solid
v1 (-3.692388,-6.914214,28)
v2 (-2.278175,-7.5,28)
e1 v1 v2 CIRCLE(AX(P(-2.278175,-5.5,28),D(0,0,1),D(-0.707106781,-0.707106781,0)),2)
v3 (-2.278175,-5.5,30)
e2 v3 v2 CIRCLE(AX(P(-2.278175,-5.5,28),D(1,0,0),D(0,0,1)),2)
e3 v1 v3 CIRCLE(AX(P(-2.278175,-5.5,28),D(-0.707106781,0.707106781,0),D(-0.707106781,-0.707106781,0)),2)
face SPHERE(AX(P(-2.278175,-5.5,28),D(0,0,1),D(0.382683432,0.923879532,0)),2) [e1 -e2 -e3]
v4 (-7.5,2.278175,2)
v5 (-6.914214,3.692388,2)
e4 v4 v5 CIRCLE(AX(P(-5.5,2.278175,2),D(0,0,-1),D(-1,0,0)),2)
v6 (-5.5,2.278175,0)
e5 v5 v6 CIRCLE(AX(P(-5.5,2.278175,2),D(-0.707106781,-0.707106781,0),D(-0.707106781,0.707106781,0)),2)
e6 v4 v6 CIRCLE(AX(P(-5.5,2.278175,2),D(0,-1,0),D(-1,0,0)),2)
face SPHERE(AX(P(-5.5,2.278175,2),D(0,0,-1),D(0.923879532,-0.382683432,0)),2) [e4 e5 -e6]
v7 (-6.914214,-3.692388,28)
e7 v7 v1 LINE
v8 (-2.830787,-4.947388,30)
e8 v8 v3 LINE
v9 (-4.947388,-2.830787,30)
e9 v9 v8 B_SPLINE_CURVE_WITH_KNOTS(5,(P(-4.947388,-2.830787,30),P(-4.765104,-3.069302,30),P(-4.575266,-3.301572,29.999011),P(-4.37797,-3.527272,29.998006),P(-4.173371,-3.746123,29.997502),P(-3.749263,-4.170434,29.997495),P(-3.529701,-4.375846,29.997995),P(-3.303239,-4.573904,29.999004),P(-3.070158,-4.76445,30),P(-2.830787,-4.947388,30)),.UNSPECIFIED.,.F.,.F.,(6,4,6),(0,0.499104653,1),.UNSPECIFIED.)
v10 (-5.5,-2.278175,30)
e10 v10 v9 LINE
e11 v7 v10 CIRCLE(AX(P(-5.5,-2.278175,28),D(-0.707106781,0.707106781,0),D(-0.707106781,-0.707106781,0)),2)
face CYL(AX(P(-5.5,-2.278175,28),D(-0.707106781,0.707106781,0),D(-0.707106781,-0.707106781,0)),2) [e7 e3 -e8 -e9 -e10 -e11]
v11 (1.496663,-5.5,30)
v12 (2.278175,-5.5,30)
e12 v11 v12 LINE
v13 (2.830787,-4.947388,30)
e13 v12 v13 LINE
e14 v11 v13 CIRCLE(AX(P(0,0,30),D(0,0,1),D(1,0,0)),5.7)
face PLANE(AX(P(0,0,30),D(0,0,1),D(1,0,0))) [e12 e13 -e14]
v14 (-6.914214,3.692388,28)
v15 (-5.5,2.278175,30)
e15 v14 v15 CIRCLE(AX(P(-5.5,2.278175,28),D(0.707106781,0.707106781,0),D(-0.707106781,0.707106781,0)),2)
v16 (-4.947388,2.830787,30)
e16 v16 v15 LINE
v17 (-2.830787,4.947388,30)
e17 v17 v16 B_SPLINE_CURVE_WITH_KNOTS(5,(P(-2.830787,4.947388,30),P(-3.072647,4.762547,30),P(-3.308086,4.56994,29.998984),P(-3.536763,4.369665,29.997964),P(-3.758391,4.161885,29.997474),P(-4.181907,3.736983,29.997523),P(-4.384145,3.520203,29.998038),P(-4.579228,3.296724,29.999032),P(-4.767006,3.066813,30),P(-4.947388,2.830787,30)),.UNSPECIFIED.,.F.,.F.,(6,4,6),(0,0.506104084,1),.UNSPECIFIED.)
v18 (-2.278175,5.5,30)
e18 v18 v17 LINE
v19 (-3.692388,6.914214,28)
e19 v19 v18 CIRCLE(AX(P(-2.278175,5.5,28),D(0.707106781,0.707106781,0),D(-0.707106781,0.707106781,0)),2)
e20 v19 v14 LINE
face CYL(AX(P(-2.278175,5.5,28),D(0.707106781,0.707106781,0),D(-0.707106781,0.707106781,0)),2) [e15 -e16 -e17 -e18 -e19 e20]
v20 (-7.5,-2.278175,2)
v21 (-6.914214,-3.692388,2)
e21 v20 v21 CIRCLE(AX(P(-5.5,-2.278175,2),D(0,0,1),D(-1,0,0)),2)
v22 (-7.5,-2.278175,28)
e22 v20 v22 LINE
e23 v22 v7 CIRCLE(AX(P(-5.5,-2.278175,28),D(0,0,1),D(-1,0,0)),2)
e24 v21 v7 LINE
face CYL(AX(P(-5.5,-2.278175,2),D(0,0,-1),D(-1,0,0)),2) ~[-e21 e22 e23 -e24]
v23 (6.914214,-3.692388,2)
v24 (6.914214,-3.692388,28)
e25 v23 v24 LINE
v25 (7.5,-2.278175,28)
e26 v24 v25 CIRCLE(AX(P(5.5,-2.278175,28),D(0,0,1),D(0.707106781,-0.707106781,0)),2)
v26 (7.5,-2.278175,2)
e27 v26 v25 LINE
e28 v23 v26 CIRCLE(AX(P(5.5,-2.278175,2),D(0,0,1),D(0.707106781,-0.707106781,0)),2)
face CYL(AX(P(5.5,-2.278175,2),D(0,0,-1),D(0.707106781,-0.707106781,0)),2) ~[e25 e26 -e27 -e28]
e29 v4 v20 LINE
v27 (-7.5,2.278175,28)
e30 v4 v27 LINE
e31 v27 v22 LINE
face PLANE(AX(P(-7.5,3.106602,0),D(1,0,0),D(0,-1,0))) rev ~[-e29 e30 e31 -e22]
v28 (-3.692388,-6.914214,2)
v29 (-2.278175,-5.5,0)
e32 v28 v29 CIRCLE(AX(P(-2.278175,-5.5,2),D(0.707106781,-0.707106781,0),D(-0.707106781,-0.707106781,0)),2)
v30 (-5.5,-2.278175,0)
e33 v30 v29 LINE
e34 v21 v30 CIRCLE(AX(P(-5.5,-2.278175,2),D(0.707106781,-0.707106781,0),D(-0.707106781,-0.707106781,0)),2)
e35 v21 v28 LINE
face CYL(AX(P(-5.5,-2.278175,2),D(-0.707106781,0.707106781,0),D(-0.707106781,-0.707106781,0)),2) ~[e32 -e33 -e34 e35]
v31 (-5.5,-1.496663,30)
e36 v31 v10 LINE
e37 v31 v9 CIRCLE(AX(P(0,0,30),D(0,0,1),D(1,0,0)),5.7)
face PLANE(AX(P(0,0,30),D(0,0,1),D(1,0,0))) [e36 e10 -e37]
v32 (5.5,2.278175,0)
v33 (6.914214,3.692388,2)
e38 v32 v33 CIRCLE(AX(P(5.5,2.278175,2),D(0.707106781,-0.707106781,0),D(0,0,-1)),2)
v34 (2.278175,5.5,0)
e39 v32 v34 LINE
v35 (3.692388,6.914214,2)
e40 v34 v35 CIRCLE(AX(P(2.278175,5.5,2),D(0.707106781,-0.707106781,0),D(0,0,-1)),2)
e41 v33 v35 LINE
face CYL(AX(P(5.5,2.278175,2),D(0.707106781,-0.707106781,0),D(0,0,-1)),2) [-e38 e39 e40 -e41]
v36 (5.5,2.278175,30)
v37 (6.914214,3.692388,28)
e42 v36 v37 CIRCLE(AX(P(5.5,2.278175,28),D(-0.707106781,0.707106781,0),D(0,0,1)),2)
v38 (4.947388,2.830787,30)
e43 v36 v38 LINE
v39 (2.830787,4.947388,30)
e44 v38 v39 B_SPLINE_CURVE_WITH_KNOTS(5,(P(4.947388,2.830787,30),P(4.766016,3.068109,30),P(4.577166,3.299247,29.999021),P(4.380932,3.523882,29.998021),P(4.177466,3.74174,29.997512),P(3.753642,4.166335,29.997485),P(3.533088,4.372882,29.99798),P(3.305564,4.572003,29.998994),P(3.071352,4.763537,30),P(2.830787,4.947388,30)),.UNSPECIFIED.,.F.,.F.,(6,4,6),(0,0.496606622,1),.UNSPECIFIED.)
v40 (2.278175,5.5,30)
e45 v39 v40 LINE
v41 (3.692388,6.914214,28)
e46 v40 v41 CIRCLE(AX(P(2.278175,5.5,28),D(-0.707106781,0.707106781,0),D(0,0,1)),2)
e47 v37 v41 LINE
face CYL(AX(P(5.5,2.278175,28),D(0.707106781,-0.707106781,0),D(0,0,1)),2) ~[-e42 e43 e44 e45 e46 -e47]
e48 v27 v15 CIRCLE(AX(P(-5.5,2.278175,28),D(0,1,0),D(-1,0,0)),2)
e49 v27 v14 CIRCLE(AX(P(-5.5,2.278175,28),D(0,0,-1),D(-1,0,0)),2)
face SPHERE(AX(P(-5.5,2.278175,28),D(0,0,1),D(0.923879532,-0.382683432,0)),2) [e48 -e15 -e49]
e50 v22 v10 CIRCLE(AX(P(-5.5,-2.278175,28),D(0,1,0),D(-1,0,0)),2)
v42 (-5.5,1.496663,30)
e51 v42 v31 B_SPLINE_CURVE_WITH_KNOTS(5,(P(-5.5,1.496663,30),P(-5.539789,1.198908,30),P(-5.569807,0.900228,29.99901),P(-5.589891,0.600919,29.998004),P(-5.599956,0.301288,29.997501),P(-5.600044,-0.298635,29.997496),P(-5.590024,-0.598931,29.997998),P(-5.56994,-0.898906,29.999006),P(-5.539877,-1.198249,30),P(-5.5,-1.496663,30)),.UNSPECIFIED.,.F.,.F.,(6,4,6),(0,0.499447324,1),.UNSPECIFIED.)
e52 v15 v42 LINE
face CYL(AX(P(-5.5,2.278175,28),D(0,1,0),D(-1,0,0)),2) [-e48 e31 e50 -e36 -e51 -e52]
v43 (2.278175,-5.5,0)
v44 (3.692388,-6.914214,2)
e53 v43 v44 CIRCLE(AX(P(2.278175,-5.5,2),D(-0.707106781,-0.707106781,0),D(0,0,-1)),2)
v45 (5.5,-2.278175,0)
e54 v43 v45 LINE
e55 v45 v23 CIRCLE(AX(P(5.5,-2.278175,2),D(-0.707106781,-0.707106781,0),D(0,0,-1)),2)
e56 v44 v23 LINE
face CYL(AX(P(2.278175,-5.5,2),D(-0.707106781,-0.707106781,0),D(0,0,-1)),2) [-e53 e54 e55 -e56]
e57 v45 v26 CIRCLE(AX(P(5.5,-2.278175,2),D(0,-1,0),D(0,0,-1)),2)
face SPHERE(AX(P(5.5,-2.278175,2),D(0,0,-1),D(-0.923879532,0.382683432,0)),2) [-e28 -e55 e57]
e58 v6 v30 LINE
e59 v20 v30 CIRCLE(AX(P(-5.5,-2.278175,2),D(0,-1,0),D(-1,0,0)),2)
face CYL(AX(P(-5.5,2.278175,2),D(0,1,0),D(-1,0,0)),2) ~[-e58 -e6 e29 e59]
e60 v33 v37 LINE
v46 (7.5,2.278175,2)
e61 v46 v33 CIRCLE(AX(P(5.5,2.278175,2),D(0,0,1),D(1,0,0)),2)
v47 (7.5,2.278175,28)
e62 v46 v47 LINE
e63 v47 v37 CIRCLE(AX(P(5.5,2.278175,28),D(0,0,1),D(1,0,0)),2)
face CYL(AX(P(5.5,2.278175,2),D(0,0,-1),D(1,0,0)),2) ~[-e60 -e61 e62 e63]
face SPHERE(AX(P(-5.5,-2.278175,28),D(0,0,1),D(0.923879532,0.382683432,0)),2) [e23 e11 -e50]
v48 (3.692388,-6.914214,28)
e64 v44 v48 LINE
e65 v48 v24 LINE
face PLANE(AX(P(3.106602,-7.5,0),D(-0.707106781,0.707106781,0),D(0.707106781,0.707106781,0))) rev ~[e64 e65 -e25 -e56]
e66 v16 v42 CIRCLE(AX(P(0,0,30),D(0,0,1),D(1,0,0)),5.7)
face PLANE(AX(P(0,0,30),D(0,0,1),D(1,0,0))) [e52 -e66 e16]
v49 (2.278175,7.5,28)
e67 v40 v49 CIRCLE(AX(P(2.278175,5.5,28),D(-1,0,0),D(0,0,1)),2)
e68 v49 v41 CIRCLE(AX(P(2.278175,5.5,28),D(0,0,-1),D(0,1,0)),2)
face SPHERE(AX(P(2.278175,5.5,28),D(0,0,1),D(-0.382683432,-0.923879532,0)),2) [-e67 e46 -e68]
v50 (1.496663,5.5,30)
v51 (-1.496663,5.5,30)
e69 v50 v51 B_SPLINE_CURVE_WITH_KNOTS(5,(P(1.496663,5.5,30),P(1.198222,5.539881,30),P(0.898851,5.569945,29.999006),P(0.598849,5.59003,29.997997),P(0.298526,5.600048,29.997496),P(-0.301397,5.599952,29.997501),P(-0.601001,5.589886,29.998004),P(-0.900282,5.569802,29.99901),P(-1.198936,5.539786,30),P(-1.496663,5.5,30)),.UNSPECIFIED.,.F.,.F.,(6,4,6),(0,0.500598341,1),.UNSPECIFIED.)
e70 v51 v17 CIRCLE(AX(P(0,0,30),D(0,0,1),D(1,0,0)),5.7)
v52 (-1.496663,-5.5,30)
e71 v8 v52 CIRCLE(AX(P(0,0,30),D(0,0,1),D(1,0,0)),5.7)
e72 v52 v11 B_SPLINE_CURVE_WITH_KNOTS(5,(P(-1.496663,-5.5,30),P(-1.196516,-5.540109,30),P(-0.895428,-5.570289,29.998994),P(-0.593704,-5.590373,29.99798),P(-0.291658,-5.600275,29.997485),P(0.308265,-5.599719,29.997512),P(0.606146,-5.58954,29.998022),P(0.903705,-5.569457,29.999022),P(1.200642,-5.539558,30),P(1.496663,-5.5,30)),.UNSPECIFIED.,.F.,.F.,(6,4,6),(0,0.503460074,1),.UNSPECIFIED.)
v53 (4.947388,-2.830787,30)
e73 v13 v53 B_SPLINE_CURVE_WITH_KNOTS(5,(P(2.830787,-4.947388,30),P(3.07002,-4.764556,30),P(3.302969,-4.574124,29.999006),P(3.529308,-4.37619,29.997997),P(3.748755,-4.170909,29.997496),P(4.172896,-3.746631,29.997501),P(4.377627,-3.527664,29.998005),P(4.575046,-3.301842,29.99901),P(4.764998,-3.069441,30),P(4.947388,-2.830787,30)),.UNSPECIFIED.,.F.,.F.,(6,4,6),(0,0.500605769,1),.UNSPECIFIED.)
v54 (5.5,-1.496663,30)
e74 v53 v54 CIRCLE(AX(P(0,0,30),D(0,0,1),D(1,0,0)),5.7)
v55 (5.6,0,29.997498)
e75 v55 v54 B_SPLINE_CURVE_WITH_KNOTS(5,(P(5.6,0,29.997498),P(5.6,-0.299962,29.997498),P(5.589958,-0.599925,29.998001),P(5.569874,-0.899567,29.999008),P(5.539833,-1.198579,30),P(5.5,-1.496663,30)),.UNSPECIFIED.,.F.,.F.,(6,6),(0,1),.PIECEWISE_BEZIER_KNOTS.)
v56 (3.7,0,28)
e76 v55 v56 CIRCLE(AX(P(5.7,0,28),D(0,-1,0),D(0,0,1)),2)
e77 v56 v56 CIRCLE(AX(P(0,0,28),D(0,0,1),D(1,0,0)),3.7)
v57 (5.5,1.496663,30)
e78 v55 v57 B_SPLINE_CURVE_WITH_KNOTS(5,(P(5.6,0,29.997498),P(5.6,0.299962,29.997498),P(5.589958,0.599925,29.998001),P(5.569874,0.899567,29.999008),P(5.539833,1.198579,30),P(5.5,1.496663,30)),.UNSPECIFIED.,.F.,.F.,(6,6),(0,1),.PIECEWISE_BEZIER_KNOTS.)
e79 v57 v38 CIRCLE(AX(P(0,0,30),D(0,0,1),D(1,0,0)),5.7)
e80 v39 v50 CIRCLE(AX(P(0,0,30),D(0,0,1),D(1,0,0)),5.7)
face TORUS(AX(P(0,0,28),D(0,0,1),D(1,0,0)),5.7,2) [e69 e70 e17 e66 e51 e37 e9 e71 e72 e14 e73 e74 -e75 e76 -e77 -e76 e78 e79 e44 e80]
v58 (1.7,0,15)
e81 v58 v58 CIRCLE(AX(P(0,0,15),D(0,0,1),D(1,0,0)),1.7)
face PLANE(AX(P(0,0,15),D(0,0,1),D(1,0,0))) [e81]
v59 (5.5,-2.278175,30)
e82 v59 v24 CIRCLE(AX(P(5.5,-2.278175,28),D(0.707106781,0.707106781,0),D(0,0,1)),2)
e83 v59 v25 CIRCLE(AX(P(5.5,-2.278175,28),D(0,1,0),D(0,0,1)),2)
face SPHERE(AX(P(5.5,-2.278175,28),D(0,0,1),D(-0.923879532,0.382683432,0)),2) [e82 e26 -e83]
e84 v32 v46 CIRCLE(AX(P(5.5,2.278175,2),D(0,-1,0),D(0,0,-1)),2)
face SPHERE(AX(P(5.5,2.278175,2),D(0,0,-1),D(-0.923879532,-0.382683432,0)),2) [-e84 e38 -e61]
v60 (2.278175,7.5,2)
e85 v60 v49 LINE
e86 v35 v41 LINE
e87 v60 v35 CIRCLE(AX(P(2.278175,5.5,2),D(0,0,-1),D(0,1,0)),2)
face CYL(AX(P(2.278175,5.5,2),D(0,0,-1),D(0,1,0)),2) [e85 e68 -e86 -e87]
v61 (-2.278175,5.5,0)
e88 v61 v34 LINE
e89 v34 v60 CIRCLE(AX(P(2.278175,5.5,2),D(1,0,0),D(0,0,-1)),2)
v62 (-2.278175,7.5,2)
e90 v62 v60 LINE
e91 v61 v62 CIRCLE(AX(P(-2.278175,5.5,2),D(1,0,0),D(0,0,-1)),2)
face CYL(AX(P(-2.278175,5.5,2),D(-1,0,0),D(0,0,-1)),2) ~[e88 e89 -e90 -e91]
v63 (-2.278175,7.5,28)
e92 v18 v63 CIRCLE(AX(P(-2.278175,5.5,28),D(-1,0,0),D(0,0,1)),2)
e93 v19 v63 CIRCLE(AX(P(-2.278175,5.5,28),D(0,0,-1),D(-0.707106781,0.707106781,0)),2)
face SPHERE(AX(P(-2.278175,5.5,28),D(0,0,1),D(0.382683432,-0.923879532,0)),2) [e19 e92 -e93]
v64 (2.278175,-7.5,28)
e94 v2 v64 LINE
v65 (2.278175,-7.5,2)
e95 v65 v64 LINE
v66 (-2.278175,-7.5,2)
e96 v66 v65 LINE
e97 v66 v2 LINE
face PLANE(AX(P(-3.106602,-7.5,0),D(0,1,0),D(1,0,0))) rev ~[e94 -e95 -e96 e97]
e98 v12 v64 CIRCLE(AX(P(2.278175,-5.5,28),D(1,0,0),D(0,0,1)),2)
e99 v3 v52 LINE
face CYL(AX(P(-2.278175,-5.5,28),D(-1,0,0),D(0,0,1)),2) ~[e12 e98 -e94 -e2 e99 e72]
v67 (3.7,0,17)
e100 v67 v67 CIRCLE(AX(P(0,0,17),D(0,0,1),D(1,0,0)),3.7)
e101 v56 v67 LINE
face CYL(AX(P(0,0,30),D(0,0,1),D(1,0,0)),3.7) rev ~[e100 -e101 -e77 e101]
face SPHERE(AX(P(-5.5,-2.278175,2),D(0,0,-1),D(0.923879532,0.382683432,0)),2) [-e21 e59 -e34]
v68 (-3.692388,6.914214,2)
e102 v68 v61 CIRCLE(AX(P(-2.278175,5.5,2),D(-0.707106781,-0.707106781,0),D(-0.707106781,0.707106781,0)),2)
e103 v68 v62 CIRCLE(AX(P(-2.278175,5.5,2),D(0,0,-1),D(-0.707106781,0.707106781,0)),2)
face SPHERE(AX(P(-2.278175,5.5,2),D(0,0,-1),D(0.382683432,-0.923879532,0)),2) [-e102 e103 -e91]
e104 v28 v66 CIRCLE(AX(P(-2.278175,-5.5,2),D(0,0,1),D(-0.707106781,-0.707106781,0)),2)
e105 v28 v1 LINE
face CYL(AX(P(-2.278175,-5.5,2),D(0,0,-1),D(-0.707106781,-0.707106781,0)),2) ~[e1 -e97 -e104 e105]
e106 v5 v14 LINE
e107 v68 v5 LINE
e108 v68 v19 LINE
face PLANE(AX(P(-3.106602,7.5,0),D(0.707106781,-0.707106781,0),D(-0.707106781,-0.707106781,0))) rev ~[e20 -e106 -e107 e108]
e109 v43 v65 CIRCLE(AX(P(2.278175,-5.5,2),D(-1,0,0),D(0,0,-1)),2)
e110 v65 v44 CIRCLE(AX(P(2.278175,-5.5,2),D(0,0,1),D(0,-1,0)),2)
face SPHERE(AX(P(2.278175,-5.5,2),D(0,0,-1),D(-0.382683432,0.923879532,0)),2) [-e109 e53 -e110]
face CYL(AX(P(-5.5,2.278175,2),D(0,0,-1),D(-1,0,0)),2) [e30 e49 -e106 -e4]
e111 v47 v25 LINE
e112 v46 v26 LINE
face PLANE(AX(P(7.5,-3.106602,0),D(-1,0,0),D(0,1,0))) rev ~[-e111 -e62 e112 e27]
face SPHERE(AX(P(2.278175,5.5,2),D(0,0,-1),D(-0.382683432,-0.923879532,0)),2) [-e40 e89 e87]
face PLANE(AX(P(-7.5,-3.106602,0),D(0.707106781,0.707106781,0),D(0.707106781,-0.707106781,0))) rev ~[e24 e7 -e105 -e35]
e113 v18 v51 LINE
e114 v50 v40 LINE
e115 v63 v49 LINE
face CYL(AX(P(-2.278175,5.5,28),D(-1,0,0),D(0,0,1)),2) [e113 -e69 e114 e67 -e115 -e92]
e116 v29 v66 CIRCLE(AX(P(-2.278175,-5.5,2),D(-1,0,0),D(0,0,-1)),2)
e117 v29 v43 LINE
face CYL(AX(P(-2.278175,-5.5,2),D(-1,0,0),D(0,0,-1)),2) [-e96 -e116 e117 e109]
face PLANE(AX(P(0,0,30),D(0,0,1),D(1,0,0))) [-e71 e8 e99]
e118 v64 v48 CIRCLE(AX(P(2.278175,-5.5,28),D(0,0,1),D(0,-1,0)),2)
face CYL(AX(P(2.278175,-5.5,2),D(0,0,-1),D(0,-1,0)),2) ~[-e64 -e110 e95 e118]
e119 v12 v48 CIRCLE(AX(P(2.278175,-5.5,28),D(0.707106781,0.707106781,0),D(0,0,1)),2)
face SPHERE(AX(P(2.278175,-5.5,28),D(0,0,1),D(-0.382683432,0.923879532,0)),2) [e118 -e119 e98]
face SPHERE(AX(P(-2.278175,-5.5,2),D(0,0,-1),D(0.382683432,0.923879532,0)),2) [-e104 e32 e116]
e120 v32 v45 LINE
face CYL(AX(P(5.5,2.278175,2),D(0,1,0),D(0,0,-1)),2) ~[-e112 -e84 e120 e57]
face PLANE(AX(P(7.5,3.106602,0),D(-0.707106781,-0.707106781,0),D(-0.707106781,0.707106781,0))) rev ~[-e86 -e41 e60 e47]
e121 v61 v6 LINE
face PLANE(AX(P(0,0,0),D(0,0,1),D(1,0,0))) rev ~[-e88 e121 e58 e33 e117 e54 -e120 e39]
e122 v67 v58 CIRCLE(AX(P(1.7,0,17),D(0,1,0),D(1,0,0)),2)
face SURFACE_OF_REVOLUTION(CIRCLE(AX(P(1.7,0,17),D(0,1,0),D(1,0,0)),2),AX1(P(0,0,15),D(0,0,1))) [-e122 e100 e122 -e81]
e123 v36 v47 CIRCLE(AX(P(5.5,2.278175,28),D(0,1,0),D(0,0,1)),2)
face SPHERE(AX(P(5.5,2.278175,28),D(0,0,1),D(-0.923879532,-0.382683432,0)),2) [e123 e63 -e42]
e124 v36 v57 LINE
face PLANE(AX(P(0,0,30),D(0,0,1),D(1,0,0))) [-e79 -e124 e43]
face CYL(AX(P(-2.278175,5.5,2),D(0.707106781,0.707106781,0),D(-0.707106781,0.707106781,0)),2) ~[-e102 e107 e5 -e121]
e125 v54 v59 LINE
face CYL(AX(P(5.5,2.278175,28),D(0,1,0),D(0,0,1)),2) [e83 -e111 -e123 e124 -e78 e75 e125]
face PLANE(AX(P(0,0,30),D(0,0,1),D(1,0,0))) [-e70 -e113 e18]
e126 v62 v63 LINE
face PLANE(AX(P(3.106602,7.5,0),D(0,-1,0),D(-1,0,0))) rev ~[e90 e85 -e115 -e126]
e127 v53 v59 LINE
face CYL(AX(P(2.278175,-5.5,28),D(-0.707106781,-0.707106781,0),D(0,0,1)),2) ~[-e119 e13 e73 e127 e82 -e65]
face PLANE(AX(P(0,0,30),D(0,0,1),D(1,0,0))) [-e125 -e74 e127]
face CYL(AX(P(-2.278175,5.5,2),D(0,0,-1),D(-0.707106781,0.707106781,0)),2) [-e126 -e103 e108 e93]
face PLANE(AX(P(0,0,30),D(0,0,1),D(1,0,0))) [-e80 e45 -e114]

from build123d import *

# Parameters (mm, degrees)
F1_DEPTH      = 30
F2_R          = 3.7
F3_DEPTH      = 15
F4_T3_DEPTH   = 4.5563491861
F4_T5_DEPTH   = 26
F4_T7_DEPTH   = 4.5563491861
F4_T9_DEPTH   = 4.5563491861
F4_T11_DEPTH  = 4.5563491861
F4_T13_DEPTH  = 4.5563491861
F4_T15_DEPTH  = 4.5563491861
F4_T20_DEPTH  = 2
F4_T26_DEPTH  = 2
F4_T32_DEPTH  = 2
F4_T38_DEPTH  = 2
F4_T44_DEPTH  = 2
F4_T50_DEPTH  = 2
F4_T56_DEPTH  = 2
F4_T62_DEPTH  = 2
F4_T68_DEPTH  = 2
F4_T74_DEPTH  = 2
F4_T80_DEPTH  = 2
F4_T86_DEPTH  = 2
F4_T92_DEPTH  = 2
F4_T98_DEPTH  = 2
F4_T104_DEPTH = 2
F4_T110_DEPTH = 2


# Not quite as in the source:
# - a fillet or chamfer that OpenCascade refuses, or shapes differently, is made with other operations: its cross-section is extruded or revolved along the edge and cut away or added


with BuildPart() as f1:
    # F0 (on Top) → F1 (new body)
    with BuildSketch(Plane.XY):
        Polygon((-7.5, 3.1066017178), (-7.5, -3.1066017178), (-3.1066017178, -7.5), (3.1066017178, -7.5), (7.5, -3.1066017178), (7.5, 3.1066017178), (3.1066017178, 7.5), (-3.1066017178, 7.5), align=None)
    extrude(amount=F1_DEPTH)

    # F2 (on face) → F3 (cut)
    with BuildSketch(Plane.XY.offset(30)):
        Circle(F2_R)
    extrude(amount=-F3_DEPTH, mode=Mode.SUBTRACT)

    # F4: fillet of radius 2 on 26 edges, made by hand

    # F4_s1 → F4_t2 (revolve)
    with BuildSketch(Plane.XZ):
        with BuildLine():
            ThreePointArc((3.7, 17), (3.1142135624, 15.5857864376), (1.7, 15))
            Line((1.7, 15), (3.7, 15))
            Line((3.7, 15), (3.7, 17))
        make_face()
    revolve(axis=Axis((0, 0, 15), (0, 0, 1)))

    # F4_s4 → F4_t3 (cut)
    with BuildSketch(Plane(origin=(-1.6109127035, -1.6109127035, 0), x_dir=(0, 0, 1), z_dir=(0.7071067812, 0.7071067812, 0))):
        with BuildLine():
            ThreePointArc((0, 5.5), (0.5857864376, 6.9142135624), (2, 7.5))
            Line((2, 7.5), (0, 7.5))
            Line((0, 7.5), (0, 5.5))
        make_face()
        with BuildLine():
            ThreePointArc((30, 5.5), (29.4142135624, 6.9142135624), (28, 7.5))
            Line((28, 7.5), (30, 7.5))
            Line((30, 7.5), (30, 5.5))
        make_face()
    extrude(amount=F4_T3_DEPTH, mode=Mode.SUBTRACT)

    # F4_s6 → F4_t5 (cut)
    with BuildSketch(Plane.XY.offset(2)):
        with BuildLine():
            ThreePointArc((6.9142135624, -3.6923881554), (7.347759065, -3.0435414578), (7.5, -2.2781745931))
            Line((7.5, -2.2781745931), (7.5, -3.1066017178))
            Line((7.5, -3.1066017178), (6.9142135624, -3.6923881554))
        make_face()
        with BuildLine():
            ThreePointArc((7.5, 2.2781745931), (7.347759065, 3.0435414578), (6.9142135624, 3.6923881554))
            Line((6.9142135624, 3.6923881554), (7.5, 3.1066017178))
            Line((7.5, 3.1066017178), (7.5, 2.2781745931))
        make_face()
        with BuildLine():
            ThreePointArc((-7.5, 2.2781745931), (-7.347759065, 3.0435414578), (-6.9142135624, 3.6923881554))
            Line((-6.9142135624, 3.6923881554), (-7.5, 3.1066017178))
            Line((-7.5, 3.1066017178), (-7.5, 2.2781745931))
        make_face()
        with BuildLine():
            ThreePointArc((-3.6923881554, 6.9142135624), (-3.0435414578, 7.347759065), (-2.2781745931, 7.5))
            Line((-2.2781745931, 7.5), (-3.1066017178, 7.5))
            Line((-3.1066017178, 7.5), (-3.6923881554, 6.9142135624))
        make_face()
        with BuildLine():
            ThreePointArc((-3.6923881554, -6.9142135624), (-3.0435414578, -7.347759065), (-2.2781745931, -7.5))
            Line((-2.2781745931, -7.5), (-3.1066017178, -7.5))
            Line((-3.1066017178, -7.5), (-3.6923881554, -6.9142135624))
        make_face()
        with BuildLine():
            ThreePointArc((-7.5, -2.2781745931), (-7.347759065, -3.0435414578), (-6.9142135624, -3.6923881554))
            Line((-6.9142135624, -3.6923881554), (-7.5, -3.1066017178))
            Line((-7.5, -3.1066017178), (-7.5, -2.2781745931))
        make_face()
        with BuildLine():
            ThreePointArc((2.2781745931, -7.5), (3.0435414578, -7.347759065), (3.6923881554, -6.9142135624))
            Line((3.6923881554, -6.9142135624), (3.1066017178, -7.5))
            Line((3.1066017178, -7.5), (2.2781745931, -7.5))
        make_face()
        with BuildLine():
            ThreePointArc((2.2781745931, 7.5), (3.0435414578, 7.347759065), (3.6923881554, 6.9142135624))
            Line((3.6923881554, 6.9142135624), (3.1066017178, 7.5))
            Line((3.1066017178, 7.5), (2.2781745931, 7.5))
        make_face()
    extrude(amount=F4_T5_DEPTH, mode=Mode.SUBTRACT)

    # F4_s8 → F4_t7 (cut)
    with BuildSketch(Plane.YZ.offset(-2.2781745931)):
        with BuildLine():
            ThreePointArc((-5.5, 0), (-6.9142135624, 0.5857864376), (-7.5, 2))
            Line((-7.5, 2), (-7.5, 0))
            Line((-7.5, 0), (-5.5, 0))
        make_face()
        with BuildLine():
            ThreePointArc((5.5, 0), (6.9142135624, 0.5857864376), (7.5, 2))
            Line((7.5, 2), (7.5, 0))
            Line((7.5, 0), (5.5, 0))
        make_face()
        with BuildLine():
            ThreePointArc((-5.5, 30), (-6.9142135624, 29.4142135624), (-7.5, 28))
            Line((-7.5, 28), (-7.5, 30))
            Line((-7.5, 30), (-5.5, 30))
        make_face()
        with BuildLine():
            ThreePointArc((5.5, 30), (6.9142135624, 29.4142135624), (7.5, 28))
            Line((7.5, 28), (7.5, 30))
            Line((7.5, 30), (5.5, 30))
        make_face()
    extrude(amount=F4_T7_DEPTH, mode=Mode.SUBTRACT)

    # F4_s10 → F4_t9 (cut)
    with BuildSketch(Plane.XZ.offset(-2.2781745931)):
        with BuildLine():
            ThreePointArc((5.5, 30), (6.9142135624, 29.4142135624), (7.5, 28))
            Line((7.5, 28), (7.5, 30))
            Line((7.5, 30), (5.5, 30))
        make_face()
        with BuildLine():
            ThreePointArc((5.5, 0), (6.9142135624, 0.5857864376), (7.5, 2))
            Line((7.5, 2), (7.5, 0))
            Line((7.5, 0), (5.5, 0))
        make_face()
        with BuildLine():
            ThreePointArc((-7.5, 2), (-6.9142135624, 0.5857864376), (-5.5, 0))
            Line((-5.5, 0), (-7.5, 0))
            Line((-7.5, 0), (-7.5, 2))
        make_face()
        with BuildLine():
            ThreePointArc((-7.5, 28), (-6.9142135624, 29.4142135624), (-5.5, 30))
            Line((-5.5, 30), (-7.5, 30))
            Line((-7.5, 30), (-7.5, 28))
        make_face()
    extrude(amount=F4_T9_DEPTH, mode=Mode.SUBTRACT)

    # F4_s12 → F4_t11 (cut)
    with BuildSketch(Plane(origin=(1.6109127035, -1.6109127035, 0), x_dir=(0, 0, 1), z_dir=(-0.7071067812, 0.7071067812, 0))):
        with BuildLine():
            ThreePointArc((0, 5.5), (0.5857864376, 6.9142135624), (2, 7.5))
            Line((2, 7.5), (0, 7.5))
            Line((0, 7.5), (0, 5.5))
        make_face()
        with BuildLine():
            ThreePointArc((30, 5.5), (29.4142135624, 6.9142135624), (28, 7.5))
            Line((28, 7.5), (30, 7.5))
            Line((30, 7.5), (30, 5.5))
        make_face()
    extrude(amount=F4_T11_DEPTH, mode=Mode.SUBTRACT)

    # F4_s14 → F4_t13 (cut)
    with BuildSketch(Plane(origin=(-1.6109127035, 1.6109127035, 0), x_dir=(0, 0, 1), z_dir=(0.7071067812, -0.7071067812, 0))):
        with BuildLine():
            ThreePointArc((2, 7.5), (0.5857864376, 6.9142135624), (0, 5.5))
            Line((0, 5.5), (0, 7.5))
            Line((0, 7.5), (2, 7.5))
        make_face()
        with BuildLine():
            ThreePointArc((28, 7.5), (29.4142135624, 6.9142135624), (30, 5.5))
            Line((30, 5.5), (30, 7.5))
            Line((30, 7.5), (28, 7.5))
        make_face()
    extrude(amount=F4_T13_DEPTH, mode=Mode.SUBTRACT)

    # F4_s16 → F4_t15 (cut)
    with BuildSketch(Plane(origin=(1.6109127035, 1.6109127035, 0), x_dir=(0, 0, 1), z_dir=(-0.7071067812, -0.7071067812, 0))):
        with BuildLine():
            ThreePointArc((28, 7.5), (29.4142135624, 6.9142135624), (30, 5.5))
            Line((30, 5.5), (30, 7.5))
            Line((30, 7.5), (28, 7.5))
        make_face()
        with BuildLine():
            ThreePointArc((2, 7.5), (0.5857864376, 6.9142135624), (0, 5.5))
            Line((0, 5.5), (0, 7.5))
            Line((0, 7.5), (2, 7.5))
        make_face()
    extrude(amount=F4_T15_DEPTH, mode=Mode.SUBTRACT)


with BuildPart() as f4_tool18:
    # F4_s19 → F4_t20 (new body)
    with BuildSketch(Plane.XY.offset(2)):
        Polygon((2.2781745931, -5.5), (2.2781745931, -7.5), (3.1066017178, -7.5), (3.6923881554, -6.9142135624), align=None)
    extrude(amount=-F4_T20_DEPTH)

    # F4_s21 → F4_t22 (revolve, cut)
    with BuildSketch(Plane(origin=(2.2781745931, -5.5, 2), x_dir=(-0.3826834324, 0.9238795325, 0), z_dir=(-0.9238795325, -0.3826834324, 0))):
        with BuildLine():
            ThreePointArc((0, -2), (2, 0), (0, 2))
            Line((0, 2), (0, -2))
        make_face()
    revolve(axis=Axis((2.2781745931, -5.5, 2), (0, 0, -1)), mode=Mode.SUBTRACT)


with BuildPart() as f1_1:
    add(f1.part)

    # F4_t17: cut F4_tool18
    add(f4_tool18.part, mode=Mode.SUBTRACT)


with BuildPart() as f4_tool24:
    # F4_s25 → F4_t26 (new body)
    with BuildSketch(Plane.XY.offset(2)):
        Polygon((5.5, -2.2781745931), (6.9142135624, -3.6923881554), (7.5, -3.1066017178), (7.5, -2.2781745931), align=None)
    extrude(amount=-F4_T26_DEPTH)

    # F4_s27 → F4_t28 (revolve, cut)
    with BuildSketch(Plane(origin=(5.5, -2.2781745931, 2), x_dir=(-0.9238795325, 0.3826834324, 0), z_dir=(-0.3826834324, -0.9238795325, 0))):
        with BuildLine():
            ThreePointArc((0, -2), (2, 0), (0, 2))
            Line((0, 2), (0, -2))
        make_face()
    revolve(axis=Axis((5.5, -2.2781745931, 2), (0, 0, -1)), mode=Mode.SUBTRACT)


with BuildPart() as f1_2:
    add(f1_1.part)

    # F4_t23: cut F4_tool24
    add(f4_tool24.part, mode=Mode.SUBTRACT)


with BuildPart() as f4_tool30:
    # F4_s31 → F4_t32 (new body)
    with BuildSketch(Plane.XY.offset(28)):
        Polygon((5.5, -2.2781745931), (6.9142135624, -3.6923881554), (7.5, -3.1066017178), (7.5, -2.2781745931), align=None)
    extrude(amount=F4_T32_DEPTH)

    # F4_s33 → F4_t34 (revolve, cut)
    with BuildSketch(Plane(origin=(5.5, -2.2781745931, 28), x_dir=(-0.9238795325, 0.3826834324, 0), z_dir=(0.3826834324, 0.9238795325, 0))):
        with BuildLine():
            ThreePointArc((0, -2), (2, 0), (0, 2))
            Line((0, 2), (0, -2))
        make_face()
    revolve(axis=Axis((5.5, -2.2781745931, 28), (0, 0, 1)), mode=Mode.SUBTRACT)


with BuildPart() as f1_3:
    add(f1_2.part)

    # F4_t29: cut F4_tool30
    add(f4_tool30.part, mode=Mode.SUBTRACT)


with BuildPart() as f4_tool36:
    # F4_s37 → F4_t38 (new body)
    with BuildSketch(Plane.XY.offset(2)):
        Polygon((5.5, 2.2781745931), (7.5, 2.2781745931), (7.5, 3.1066017178), (6.9142135624, 3.6923881554), align=None)
    extrude(amount=-F4_T38_DEPTH)

    # F4_s39 → F4_t40 (revolve, cut)
    with BuildSketch(Plane(origin=(5.5, 2.2781745931, 2), x_dir=(-0.9238795325, -0.3826834324, 0), z_dir=(0.3826834324, -0.9238795325, 0))):
        with BuildLine():
            ThreePointArc((0, -2), (2, 0), (0, 2))
            Line((0, 2), (0, -2))
        make_face()
    revolve(axis=Axis((5.5, 2.2781745931, 2), (0, 0, -1)), mode=Mode.SUBTRACT)


with BuildPart() as f1_4:
    add(f1_3.part)

    # F4_t35: cut F4_tool36
    add(f4_tool36.part, mode=Mode.SUBTRACT)


with BuildPart() as f4_tool42:
    # F4_s43 → F4_t44 (new body)
    with BuildSketch(Plane.XY.offset(28)):
        Polygon((5.5, 2.2781745931), (7.5, 2.2781745931), (7.5, 3.1066017178), (6.9142135624, 3.6923881554), align=None)
    extrude(amount=F4_T44_DEPTH)

    # F4_s45 → F4_t46 (revolve, cut)
    with BuildSketch(Plane(origin=(5.5, 2.2781745931, 28), x_dir=(-0.9238795325, -0.3826834324, 0), z_dir=(-0.3826834324, 0.9238795325, 0))):
        with BuildLine():
            ThreePointArc((0, -2), (2, 0), (0, 2))
            Line((0, 2), (0, -2))
        make_face()
    revolve(axis=Axis((5.5, 2.2781745931, 28), (0, 0, 1)), mode=Mode.SUBTRACT)


with BuildPart() as f1_5:
    add(f1_4.part)

    # F4_t41: cut F4_tool42
    add(f4_tool42.part, mode=Mode.SUBTRACT)


with BuildPart() as f4_tool48:
    # F4_s49 → F4_t50 (new body)
    with BuildSketch(Plane.XY.offset(2)):
        Polygon((-2.2781745931, -5.5), (-2.2781745931, -7.5), (-3.1066017178, -7.5), (-3.6923881554, -6.9142135624), align=None)
    extrude(amount=-F4_T50_DEPTH)

    # F4_s51 → F4_t52 (revolve, cut)
    with BuildSketch(Plane(origin=(-2.2781745931, -5.5, 2), x_dir=(0.3826834324, 0.9238795325, 0), z_dir=(-0.9238795325, 0.3826834324, 0))):
        with BuildLine():
            ThreePointArc((0, -2), (2, 0), (0, 2))
            Line((0, 2), (0, -2))
        make_face()
    revolve(axis=Axis((-2.2781745931, -5.5, 2), (0, 0, -1)), mode=Mode.SUBTRACT)


with BuildPart() as f1_6:
    add(f1_5.part)

    # F4_t47: cut F4_tool48
    add(f4_tool48.part, mode=Mode.SUBTRACT)


with BuildPart() as f4_tool54:
    # F4_s55 → F4_t56 (new body)
    with BuildSketch(Plane.XY.offset(2)):
        Polygon((2.2781745931, 5.5), (2.2781745931, 7.5), (3.1066017178, 7.5), (3.6923881554, 6.9142135624), align=None)
    extrude(amount=-F4_T56_DEPTH)

    # F4_s57 → F4_t58 (revolve, cut)
    with BuildSketch(Plane(origin=(2.2781745931, 5.5, 2), x_dir=(-0.3826834324, -0.9238795325, 0), z_dir=(0.9238795325, -0.3826834324, 0))):
        with BuildLine():
            ThreePointArc((0, -2), (2, 0), (0, 2))
            Line((0, 2), (0, -2))
        make_face()
    revolve(axis=Axis((2.2781745931, 5.5, 2), (0, 0, -1)), mode=Mode.SUBTRACT)


with BuildPart() as f1_7:
    add(f1_6.part)

    # F4_t53: cut F4_tool54
    add(f4_tool54.part, mode=Mode.SUBTRACT)


with BuildPart() as f4_tool60:
    # F4_s61 → F4_t62 (new body)
    with BuildSketch(Plane.XY.offset(2)):
        Polygon((-2.2781745931, 5.5), (-2.2781745931, 7.5), (-3.1066017178, 7.5), (-3.6923881554, 6.9142135624), align=None)
    extrude(amount=-F4_T62_DEPTH)

    # F4_s63 → F4_t64 (revolve, cut)
    with BuildSketch(Plane(origin=(-2.2781745931, 5.5, 2), x_dir=(0.3826834324, -0.9238795325, 0), z_dir=(0.9238795325, 0.3826834324, 0))):
        with BuildLine():
            ThreePointArc((0, -2), (2, 0), (0, 2))
            Line((0, 2), (0, -2))
        make_face()
    revolve(axis=Axis((-2.2781745931, 5.5, 2), (0, 0, -1)), mode=Mode.SUBTRACT)


with BuildPart() as f1_8:
    add(f1_7.part)

    # F4_t59: cut F4_tool60
    add(f4_tool60.part, mode=Mode.SUBTRACT)


with BuildPart() as f4_tool66:
    # F4_s67 → F4_t68 (new body)
    with BuildSketch(Plane.XY.offset(2)):
        Polygon((-5.5, -2.2781745931), (-7.5, -2.2781745931), (-7.5, -3.1066017178), (-6.9142135624, -3.6923881554), align=None)
    extrude(amount=-F4_T68_DEPTH)

    # F4_s69 → F4_t70 (revolve, cut)
    with BuildSketch(Plane(origin=(-5.5, -2.2781745931, 2), x_dir=(0.9238795325, 0.3826834324, 0), z_dir=(-0.3826834324, 0.9238795325, 0))):
        with BuildLine():
            ThreePointArc((0, -2), (2, 0), (0, 2))
            Line((0, 2), (0, -2))
        make_face()
    revolve(axis=Axis((-5.5, -2.2781745931, 2), (0, 0, -1)), mode=Mode.SUBTRACT)


with BuildPart() as f1_9:
    add(f1_8.part)

    # F4_t65: cut F4_tool66
    add(f4_tool66.part, mode=Mode.SUBTRACT)


with BuildPart() as f4_tool72:
    # F4_s73 → F4_t74 (new body)
    with BuildSketch(Plane.XY.offset(2)):
        Polygon((-5.5, 2.2781745931), (-7.5, 2.2781745931), (-7.5, 3.1066017178), (-6.9142135624, 3.6923881554), align=None)
    extrude(amount=-F4_T74_DEPTH)

    # F4_s75 → F4_t76 (revolve, cut)
    with BuildSketch(Plane(origin=(-5.5, 2.2781745931, 2), x_dir=(0.9238795325, -0.3826834324, 0), z_dir=(0.3826834324, 0.9238795325, 0))):
        with BuildLine():
            ThreePointArc((0, -2), (2, 0), (0, 2))
            Line((0, 2), (0, -2))
        make_face()
    revolve(axis=Axis((-5.5, 2.2781745931, 2), (0, 0, -1)), mode=Mode.SUBTRACT)


with BuildPart() as f1_10:
    add(f1_9.part)

    # F4_t71: cut F4_tool72
    add(f4_tool72.part, mode=Mode.SUBTRACT)


with BuildPart() as f4_tool78:
    # F4_s79 → F4_t80 (new body)
    with BuildSketch(Plane.XY.offset(28)):
        Polygon((-5.5, 2.2781745931), (-7.5, 2.2781745931), (-7.5, 3.1066017178), (-6.9142135624, 3.6923881554), align=None)
    extrude(amount=F4_T80_DEPTH)

    # F4_s81 → F4_t82 (revolve, cut)
    with BuildSketch(Plane(origin=(-5.5, 2.2781745931, 28), x_dir=(0.9238795325, -0.3826834324, 0), z_dir=(-0.3826834324, -0.9238795325, 0))):
        with BuildLine():
            ThreePointArc((0, -2), (2, 0), (0, 2))
            Line((0, 2), (0, -2))
        make_face()
    revolve(axis=Axis((-5.5, 2.2781745931, 28), (0, 0, 1)), mode=Mode.SUBTRACT)


with BuildPart() as f1_11:
    add(f1_10.part)

    # F4_t77: cut F4_tool78
    add(f4_tool78.part, mode=Mode.SUBTRACT)


with BuildPart() as f4_tool84:
    # F4_s85 → F4_t86 (new body)
    with BuildSketch(Plane.XY.offset(28)):
        Polygon((-2.2781745931, 5.5), (-2.2781745931, 7.5), (-3.1066017178, 7.5), (-3.6923881554, 6.9142135624), align=None)
    extrude(amount=F4_T86_DEPTH)

    # F4_s87 → F4_t88 (revolve, cut)
    with BuildSketch(Plane(origin=(-2.2781745931, 5.5, 28), x_dir=(0.3826834324, -0.9238795325, 0), z_dir=(-0.9238795325, -0.3826834324, 0))):
        with BuildLine():
            ThreePointArc((0, -2), (2, 0), (0, 2))
            Line((0, 2), (0, -2))
        make_face()
    revolve(axis=Axis((-2.2781745931, 5.5, 28), (0, 0, 1)), mode=Mode.SUBTRACT)


with BuildPart() as f1_12:
    add(f1_11.part)

    # F4_t83: cut F4_tool84
    add(f4_tool84.part, mode=Mode.SUBTRACT)


with BuildPart() as f4_tool90:
    # F4_s91 → F4_t92 (new body)
    with BuildSketch(Plane.XY.offset(28)):
        Polygon((-2.2781745931, -5.5), (-2.2781745931, -7.5), (-3.1066017178, -7.5), (-3.6923881554, -6.9142135624), align=None)
    extrude(amount=F4_T92_DEPTH)

    # F4_s93 → F4_t94 (revolve, cut)
    with BuildSketch(Plane(origin=(-2.2781745931, -5.5, 28), x_dir=(0.3826834324, 0.9238795325, 0), z_dir=(0.9238795325, -0.3826834324, 0))):
        with BuildLine():
            ThreePointArc((0, -2), (2, 0), (0, 2))
            Line((0, 2), (0, -2))
        make_face()
    revolve(axis=Axis((-2.2781745931, -5.5, 28), (0, 0, 1)), mode=Mode.SUBTRACT)


with BuildPart() as f1_13:
    add(f1_12.part)

    # F4_t89: cut F4_tool90
    add(f4_tool90.part, mode=Mode.SUBTRACT)


with BuildPart() as f4_tool96:
    # F4_s97 → F4_t98 (new body)
    with BuildSketch(Plane.XY.offset(28)):
        Polygon((-5.5, -2.2781745931), (-7.5, -2.2781745931), (-7.5, -3.1066017178), (-6.9142135624, -3.6923881554), align=None)
    extrude(amount=F4_T98_DEPTH)

    # F4_s99 → F4_t100 (revolve, cut)
    with BuildSketch(Plane(origin=(-5.5, -2.2781745931, 28), x_dir=(0.9238795325, 0.3826834324, 0), z_dir=(0.3826834324, -0.9238795325, 0))):
        with BuildLine():
            ThreePointArc((0, -2), (2, 0), (0, 2))
            Line((0, 2), (0, -2))
        make_face()
    revolve(axis=Axis((-5.5, -2.2781745931, 28), (0, 0, 1)), mode=Mode.SUBTRACT)


with BuildPart() as f1_14:
    add(f1_13.part)

    # F4_t95: cut F4_tool96
    add(f4_tool96.part, mode=Mode.SUBTRACT)


with BuildPart() as f4_tool102:
    # F4_s103 → F4_t104 (new body)
    with BuildSketch(Plane.XY.offset(28)):
        Polygon((2.2781745931, -5.5), (2.2781745931, -7.5), (3.1066017178, -7.5), (3.6923881554, -6.9142135624), align=None)
    extrude(amount=F4_T104_DEPTH)

    # F4_s105 → F4_t106 (revolve, cut)
    with BuildSketch(Plane(origin=(2.2781745931, -5.5, 28), x_dir=(-0.3826834324, 0.9238795325, 0), z_dir=(0.9238795325, 0.3826834324, 0))):
        with BuildLine():
            ThreePointArc((0, -2), (2, 0), (0, 2))
            Line((0, 2), (0, -2))
        make_face()
    revolve(axis=Axis((2.2781745931, -5.5, 28), (0, 0, 1)), mode=Mode.SUBTRACT)


with BuildPart() as f1_15:
    add(f1_14.part)

    # F4_t101: cut F4_tool102
    add(f4_tool102.part, mode=Mode.SUBTRACT)


with BuildPart() as f4_tool108:
    # F4_s109 → F4_t110 (new body)
    with BuildSketch(Plane.XY.offset(28)):
        Polygon((2.2781745931, 5.5), (2.2781745931, 7.5), (3.1066017178, 7.5), (3.6923881554, 6.9142135624), align=None)
    extrude(amount=F4_T110_DEPTH)

    # F4_s111 → F4_t112 (revolve, cut)
    with BuildSketch(Plane(origin=(2.2781745931, 5.5, 28), x_dir=(-0.3826834324, -0.9238795325, 0), z_dir=(-0.9238795325, 0.3826834324, 0))):
        with BuildLine():
            ThreePointArc((0, -2), (2, 0), (0, 2))
            Line((0, 2), (0, -2))
        make_face()
    revolve(axis=Axis((2.2781745931, 5.5, 28), (0, 0, 1)), mode=Mode.SUBTRACT)


with BuildPart() as f1_16:
    add(f1_15.part)

    # F4_t107: cut F4_tool108
    add(f4_tool108.part, mode=Mode.SUBTRACT)

    # F4_s113 → F4_t114 (revolve, cut)
    with BuildSketch(Plane.XZ):
        with BuildLine():
            ThreePointArc((5.7, 30), (4.2857864376, 29.4142135624), (3.7, 28))
            Line((3.7, 28), (3.7, 30))
            Line((3.7, 30), (5.7, 30))
        make_face()
    revolve(axis=Axis((0, 0, 30), (0, 0, 1)), mode=Mode.SUBTRACT)


solid = f1_16.part
